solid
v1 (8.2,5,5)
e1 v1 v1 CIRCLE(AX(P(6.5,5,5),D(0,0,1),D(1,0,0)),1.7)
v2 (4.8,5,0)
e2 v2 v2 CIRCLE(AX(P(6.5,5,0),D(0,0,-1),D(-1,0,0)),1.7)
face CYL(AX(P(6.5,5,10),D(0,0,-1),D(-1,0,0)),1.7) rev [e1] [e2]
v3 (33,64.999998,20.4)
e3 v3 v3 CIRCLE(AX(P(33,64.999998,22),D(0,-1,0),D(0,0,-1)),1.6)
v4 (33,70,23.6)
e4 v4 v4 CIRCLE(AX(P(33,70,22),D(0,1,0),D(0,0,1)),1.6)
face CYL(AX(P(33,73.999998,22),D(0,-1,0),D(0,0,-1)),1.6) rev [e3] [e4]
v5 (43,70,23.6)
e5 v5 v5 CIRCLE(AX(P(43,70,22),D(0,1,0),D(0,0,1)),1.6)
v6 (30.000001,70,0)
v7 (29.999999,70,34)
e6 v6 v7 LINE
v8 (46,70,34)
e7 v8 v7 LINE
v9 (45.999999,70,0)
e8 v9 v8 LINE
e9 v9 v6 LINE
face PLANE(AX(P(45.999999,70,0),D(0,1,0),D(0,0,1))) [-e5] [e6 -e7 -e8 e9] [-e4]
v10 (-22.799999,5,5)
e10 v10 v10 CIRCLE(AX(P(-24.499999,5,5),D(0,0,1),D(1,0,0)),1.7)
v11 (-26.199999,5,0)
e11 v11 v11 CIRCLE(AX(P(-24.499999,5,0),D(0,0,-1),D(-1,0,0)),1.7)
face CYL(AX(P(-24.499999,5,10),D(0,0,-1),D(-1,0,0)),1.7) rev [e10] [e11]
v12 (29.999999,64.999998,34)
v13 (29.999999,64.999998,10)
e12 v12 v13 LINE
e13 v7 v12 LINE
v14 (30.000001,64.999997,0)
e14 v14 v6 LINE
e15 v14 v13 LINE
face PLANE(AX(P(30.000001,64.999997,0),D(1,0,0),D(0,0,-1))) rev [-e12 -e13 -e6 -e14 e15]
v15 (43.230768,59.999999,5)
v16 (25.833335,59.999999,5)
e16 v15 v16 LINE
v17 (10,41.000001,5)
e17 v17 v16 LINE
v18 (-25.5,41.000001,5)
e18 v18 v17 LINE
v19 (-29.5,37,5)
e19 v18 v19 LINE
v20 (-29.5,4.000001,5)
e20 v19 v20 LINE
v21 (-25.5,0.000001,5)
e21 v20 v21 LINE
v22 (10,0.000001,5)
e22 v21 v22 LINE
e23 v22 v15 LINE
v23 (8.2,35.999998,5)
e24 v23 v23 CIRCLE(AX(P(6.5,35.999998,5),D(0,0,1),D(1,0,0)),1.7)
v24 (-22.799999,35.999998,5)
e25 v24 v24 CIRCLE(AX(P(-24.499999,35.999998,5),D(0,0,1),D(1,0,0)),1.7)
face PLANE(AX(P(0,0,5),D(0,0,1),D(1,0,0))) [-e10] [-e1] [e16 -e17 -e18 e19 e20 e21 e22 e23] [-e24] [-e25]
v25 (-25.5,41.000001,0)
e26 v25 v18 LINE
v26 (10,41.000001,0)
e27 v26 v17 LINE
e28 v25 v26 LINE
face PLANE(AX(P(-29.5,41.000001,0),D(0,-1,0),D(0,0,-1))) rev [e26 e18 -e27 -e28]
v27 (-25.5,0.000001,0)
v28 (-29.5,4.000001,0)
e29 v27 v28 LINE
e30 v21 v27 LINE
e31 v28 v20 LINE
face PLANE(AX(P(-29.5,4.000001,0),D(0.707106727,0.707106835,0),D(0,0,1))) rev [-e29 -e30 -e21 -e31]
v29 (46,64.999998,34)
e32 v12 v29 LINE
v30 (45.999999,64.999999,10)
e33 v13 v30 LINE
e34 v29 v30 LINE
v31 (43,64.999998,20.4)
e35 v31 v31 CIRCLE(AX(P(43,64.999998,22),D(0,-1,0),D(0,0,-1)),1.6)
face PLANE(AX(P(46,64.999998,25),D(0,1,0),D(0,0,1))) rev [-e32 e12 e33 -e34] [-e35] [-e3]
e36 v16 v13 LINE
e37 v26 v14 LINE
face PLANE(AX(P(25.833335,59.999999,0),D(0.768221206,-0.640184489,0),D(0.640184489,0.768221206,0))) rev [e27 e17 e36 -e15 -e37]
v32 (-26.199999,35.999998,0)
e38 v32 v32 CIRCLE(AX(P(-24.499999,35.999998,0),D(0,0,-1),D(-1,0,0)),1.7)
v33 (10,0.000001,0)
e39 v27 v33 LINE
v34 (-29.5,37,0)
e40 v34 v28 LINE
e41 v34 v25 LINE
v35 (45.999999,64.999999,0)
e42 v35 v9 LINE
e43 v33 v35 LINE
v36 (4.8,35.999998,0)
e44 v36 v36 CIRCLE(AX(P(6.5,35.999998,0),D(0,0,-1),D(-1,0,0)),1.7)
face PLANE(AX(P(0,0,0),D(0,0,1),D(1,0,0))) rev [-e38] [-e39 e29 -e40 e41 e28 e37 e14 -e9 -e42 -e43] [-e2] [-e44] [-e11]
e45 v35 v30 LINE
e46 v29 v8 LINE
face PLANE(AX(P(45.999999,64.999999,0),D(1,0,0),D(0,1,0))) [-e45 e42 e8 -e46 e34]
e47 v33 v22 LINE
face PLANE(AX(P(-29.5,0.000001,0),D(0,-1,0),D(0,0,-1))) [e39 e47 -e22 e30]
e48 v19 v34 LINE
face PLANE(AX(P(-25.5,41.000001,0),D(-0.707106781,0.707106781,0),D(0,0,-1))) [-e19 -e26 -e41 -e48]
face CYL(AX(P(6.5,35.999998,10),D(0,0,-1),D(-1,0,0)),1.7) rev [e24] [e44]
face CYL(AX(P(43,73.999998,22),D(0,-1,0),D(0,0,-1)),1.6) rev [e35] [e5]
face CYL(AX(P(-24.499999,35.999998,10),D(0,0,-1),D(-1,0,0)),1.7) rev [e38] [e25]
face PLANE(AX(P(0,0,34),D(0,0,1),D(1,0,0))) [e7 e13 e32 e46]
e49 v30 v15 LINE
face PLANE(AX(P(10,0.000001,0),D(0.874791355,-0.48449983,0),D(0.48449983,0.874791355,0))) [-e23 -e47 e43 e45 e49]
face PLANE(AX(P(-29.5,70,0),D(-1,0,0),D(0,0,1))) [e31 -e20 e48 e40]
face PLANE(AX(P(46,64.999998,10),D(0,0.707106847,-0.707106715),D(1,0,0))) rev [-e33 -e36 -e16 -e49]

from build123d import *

# Parameters (mm, degrees)
P_IDAT_VYSUNUT_M1_DEPTH   = 4.999999888
ODEBRAT_VYSUNUT_M1_DEPTH  = 84.910666461
SKICA3_W                  = 16.00000076
SKICA3_H                  = 5.000002682
P_IDAT_VYSUNUT_M2_DEPTH   = 20
ODEBRAT_VYSUNUT_M3_DEPTH  = 87.116200856
ODEBRAT_VYSUNUT_M4_DEPTH  = 87.116200856
ODEBRAT_VYSUNUT_M5_DEPTH  = 87.116200856
ODEBRAT_VYSUNUT_M6_DEPTH  = 87.116200856
ZKOSEN_1_SIZE             = 4.000000656
ZKOSEN_2_SIZE             = 4.999998957
ZKOSEN_2_SIZE_2           = 4.999999888
ZKOSEN_3_SIZE             = 3.999999976
ZKOSEN_3_SIZE2            = 4.000000587
SKICA11_R                 = 1.7
ODEBRAT_VYSUNUT_M9_DEPTH  = 10
SKICA12_W                 = 16.00000076
SKICA12_H                 = 5.000002682
P_IDAT_VYSUNUT_M3_DEPTH   = 9
SKICA10_R                 = 1.6
SKICA10_R_2               = 1.599999993
ODEBRAT_VYSUNUT_M10_DEPTH = 9


with BuildPart() as part:
    # Skica1 → Přidat vysunutím1 (new body)
    with BuildSketch(Plane.XY.offset(4.999999888)):
        Polygon((45.999998971, 70.000000298), (-29.500000179, 70.000000298), (-29.500000179, 6.8e-07), (9.999999776, 6.8e-07), (45.999998971, 64.999998915), align=None)
    extrude(amount=-P_IDAT_VYSUNUT_M1_DEPTH)

    # Skica2 → Odebrat vysunutím1 (cut, through all)
    with BuildSketch(Plane.XY.offset(4.999999888)):
        Polygon((25.833334774, 59.999998659), (30.000000641, 64.999996523), (30.000000641, 70.000000298), (-29.500000179, 70.000000298), (-29.500000179, 41.000001132), (9.999999776, 41.000001132), align=None)
    extrude(amount=-ODEBRAT_VYSUNUT_M1_DEPTH, mode=Mode.SUBTRACT)

    # Skica3 → Přidat vysunutím2 (add)
    with BuildSketch(Plane.XY.offset(4.999999888)):
        with Locations((37.999999709, 67.499998957)):
            Rectangle(SKICA3_W, SKICA3_H)
    extrude(amount=P_IDAT_VYSUNUT_M2_DEPTH)

    # Skica5 → Odebrat vysunutím3 (cut, through all)
    with BuildSketch(Plane.XY.offset(4.999999888)):
        Polygon((-23.097474128, 4.468092229), (-23.010937497, 4.819194786), (-23.010937497, 5.180804525), (-23.097474128, 5.531907082), (-23.265523836, 5.85209718), (-23.505315185, 6.122766063), (-23.802915588, 6.328184158), (-24.141026661, 6.456412841), (-24.499999359, 6.500000134), (-24.85897392, 6.456412841), (-25.197084993, 6.328184158), (-25.494683534, 6.122766063), (-25.734476745, 5.85209718), (-25.90252459, 5.531907082), (-25.989063084, 5.180804525), (-25.989063084, 4.819194786), (-25.90252459, 4.468092229), (-25.734476745, 4.147903062), (-25.494683534, 3.877233714), (-25.197084993, 3.671815852), (-24.85897392, 3.543587169), (-24.499999359, 3.500000108), (-24.141026661, 3.543587169), (-23.802915588, 3.671815852), (-23.505315185, 3.877233714), (-23.265523836, 4.147903062), align=None)
    extrude(amount=-ODEBRAT_VYSUNUT_M3_DEPTH, mode=Mode.SUBTRACT)

    # Skica6 → Odebrat vysunutím4 (cut, through all)
    with BuildSketch(Plane.XY.offset(4.999999888)):
        Polygon((5.505315959, 3.877233714), (5.802914966, 3.671815852), (6.141026504, 3.543587169), (6.500000134, 3.500000108), (6.858973298, 3.543587169), (7.197084371, 3.671815852), (7.494683843, 3.877233714), (7.734475657, 4.147903062), (7.902524434, 4.468092229), (7.989062928, 4.819194786), (7.989062928, 5.180804525), (7.902524434, 5.531907082), (7.734475657, 5.85209718), (7.494683843, 6.122766063), (7.197084371, 6.328184158), (6.858973298, 6.456412841), (6.500000134, 6.500000134), (6.141026504, 6.456412841), (5.802914966, 6.328184158), (5.505315959, 6.122766063), (5.26552368, 5.85209718), (5.097475369, 5.531907082), (5.010936875, 5.180804525), (5.010936875, 4.819194786), (5.097475369, 4.468092229), (5.26552368, 4.147903062), align=None)
    extrude(amount=-ODEBRAT_VYSUNUT_M4_DEPTH, mode=Mode.SUBTRACT)

    # Skica7 → Odebrat vysunutím5 (cut, through all)
    with BuildSketch(Plane.XY.offset(4.999999888)):
        Polygon((-23.377234116, 35.005312413), (-23.171816021, 35.302914679), (-23.043585941, 35.641025752), (-23.000000045, 35.99999845), (-23.043585941, 36.358974874), (-23.171816021, 36.697082222), (-23.377234116, 36.994680762), (-23.647902533, 37.234473974), (-23.968091235, 37.402521819), (-24.319194257, 37.489064038), (-24.680804461, 37.489064038), (-25.031907484, 37.402521819), (-25.352096185, 37.234473974), (-25.622766465, 36.994680762), (-25.82818456, 36.697082222), (-25.956412777, 36.358974874), (-26.000000536, 35.99999845), (-25.956412777, 35.641025752), (-25.82818456, 35.302914679), (-25.622766465, 35.005312413), (-25.352096185, 34.765522927), (-25.031907484, 34.597471356), (-24.680804461, 34.510936588), (-24.319194257, 34.510936588), (-23.968091235, 34.597471356), (-23.647902533, 34.765522927), align=None)
    extrude(amount=-ODEBRAT_VYSUNUT_M5_DEPTH, mode=Mode.SUBTRACT)

    # Skica8 → Odebrat vysunutím6 (cut, through all)
    with BuildSketch(Plane.XY.offset(4.999999888)):
        Polygon((5.968092475, 34.597471356), (6.319194566, 34.510936588), (6.68080477, 34.510936588), (7.031906862, 34.597471356), (7.35209696, 34.765522927), (7.622765843, 35.005312413), (7.828184403, 35.302914679), (7.956412621, 35.641025752), (8.00000038, 35.99999845), (7.956412621, 36.358974874), (7.828184403, 36.697082222), (7.622765843, 36.994680762), (7.35209696, 37.234473974), (7.031906862, 37.402521819), (6.68080477, 37.489064038), (6.319194566, 37.489064038), (5.968092475, 37.402521819), (5.647902843, 37.234473974), (5.377233494, 36.994680762), (5.171815865, 36.697082222), (5.043587182, 36.358974874), (4.999999888, 35.99999845), (5.043587182, 35.641025752), (5.171815865, 35.302914679), (5.377233494, 35.005312413), (5.647902843, 34.765522927), align=None)
    extrude(amount=-ODEBRAT_VYSUNUT_M6_DEPTH, mode=Mode.SUBTRACT)

    # Zkosení1
    zkosen_1_edges = [part.edges().sort_by_distance(p)[0] for p in [
        (-29.500000179, 41.000001132, 2.499999944),
    ]]
    chamfer(zkosen_1_edges, length=ZKOSEN_1_SIZE)

    # Zkosení2
    # the kernel refuses this chamfer: 4.999999888, 4.999998957 mm, written as the material it adds along each edge
    with BuildSketch(Plane(origin=(58.858412936, 64.999997616, 4.999999888), x_dir=(0, -0.999621916702082, -0.027495884216655726), z_dir=(-1, 0, 0))) as zkosen_2_piece_1_section:
        Polygon((ZKOSEN_2_SIZE * 0.999621916686, ZKOSEN_2_SIZE * 0.0274958842162), (-ZKOSEN_2_SIZE_2 * 0.027495884218, ZKOSEN_2_SIZE_2 * 0.99962191675), (0, 0), align=None)
    zkosen_2_piece_1 = extrude(amount=41.716826979, mode=Mode.PRIVATE)
    zkosen_2_piece_1 = split(zkosen_2_piece_1, bisect_by=Plane(origin=(43.332283636, 60.183290695, 6.69217666), z_dir=(-0.8747913551064548, 0.4844998297533371, 0)), keep=Keep.TOP, mode=Mode.PRIVATE)
    zkosen_2_piece_1 = split(zkosen_2_piece_1, bisect_by=Plane(origin=(32.300745654, 67.760889889, 6.69217666), z_dir=(0.7682212055202173, -0.6401844885570597, 0)), keep=Keep.TOP, mode=Mode.PRIVATE)
    add(zkosen_2_piece_1)

    # Zkosení3
    zkosen_3_edges = [part.edges().sort_by_distance(p)[0] for p in [
        (-29.500000179, 6.8e-07, 2.499999944),
    ]]
    zkosen_3_side = [part.faces().sort_by_distance(p)[0] for p in [
        (-9.750000201, 6.8e-07, 2.499999944),
    ]]
    chamfer(zkosen_3_edges, length=ZKOSEN_3_SIZE, length2=ZKOSEN_3_SIZE2, reference=zkosen_3_side[0])

    # Skica11 → Odebrat vysunutím9 (cut)
    with BuildSketch(Plane(origin=(0, 0, 0), x_dir=(-1, 0, 0), z_dir=(0, 0, -1))):
        with Locations((-6.500000134, 35.99999845)):
            Circle(SKICA11_R)
        with Locations((24.499998894, 35.99999845)):
            Circle(SKICA11_R)
        with Locations((-6.500000134, 4.999999655)):
            Circle(SKICA11_R)
        with Locations((24.499999359, 4.999999655)):
            Circle(SKICA11_R)
    extrude(amount=-ODEBRAT_VYSUNUT_M9_DEPTH, mode=Mode.SUBTRACT)

    # Skica12 → Přidat vysunutím3 (add)
    with BuildSketch(Plane.XY.offset(24.999999888)):
        with Locations((37.999999709, 67.499998957)):
            Rectangle(SKICA12_W, SKICA12_H)
    extrude(amount=P_IDAT_VYSUNUT_M3_DEPTH)

    # Skica10 → Odebrat vysunutím10 (cut)
    with BuildSketch(Plane.XZ.offset(-64.999997616)):
        with Locations(Location((32.999999717, 21.999999776, 0), (0, 0, 270))):
            Circle(SKICA10_R)
        with Locations(Location((42.999999717, 21.999999776, 0), (0, 0, 270))):
            Circle(SKICA10_R_2)
    extrude(amount=-ODEBRAT_VYSUNUT_M10_DEPTH, mode=Mode.SUBTRACT)


solid = part.part
